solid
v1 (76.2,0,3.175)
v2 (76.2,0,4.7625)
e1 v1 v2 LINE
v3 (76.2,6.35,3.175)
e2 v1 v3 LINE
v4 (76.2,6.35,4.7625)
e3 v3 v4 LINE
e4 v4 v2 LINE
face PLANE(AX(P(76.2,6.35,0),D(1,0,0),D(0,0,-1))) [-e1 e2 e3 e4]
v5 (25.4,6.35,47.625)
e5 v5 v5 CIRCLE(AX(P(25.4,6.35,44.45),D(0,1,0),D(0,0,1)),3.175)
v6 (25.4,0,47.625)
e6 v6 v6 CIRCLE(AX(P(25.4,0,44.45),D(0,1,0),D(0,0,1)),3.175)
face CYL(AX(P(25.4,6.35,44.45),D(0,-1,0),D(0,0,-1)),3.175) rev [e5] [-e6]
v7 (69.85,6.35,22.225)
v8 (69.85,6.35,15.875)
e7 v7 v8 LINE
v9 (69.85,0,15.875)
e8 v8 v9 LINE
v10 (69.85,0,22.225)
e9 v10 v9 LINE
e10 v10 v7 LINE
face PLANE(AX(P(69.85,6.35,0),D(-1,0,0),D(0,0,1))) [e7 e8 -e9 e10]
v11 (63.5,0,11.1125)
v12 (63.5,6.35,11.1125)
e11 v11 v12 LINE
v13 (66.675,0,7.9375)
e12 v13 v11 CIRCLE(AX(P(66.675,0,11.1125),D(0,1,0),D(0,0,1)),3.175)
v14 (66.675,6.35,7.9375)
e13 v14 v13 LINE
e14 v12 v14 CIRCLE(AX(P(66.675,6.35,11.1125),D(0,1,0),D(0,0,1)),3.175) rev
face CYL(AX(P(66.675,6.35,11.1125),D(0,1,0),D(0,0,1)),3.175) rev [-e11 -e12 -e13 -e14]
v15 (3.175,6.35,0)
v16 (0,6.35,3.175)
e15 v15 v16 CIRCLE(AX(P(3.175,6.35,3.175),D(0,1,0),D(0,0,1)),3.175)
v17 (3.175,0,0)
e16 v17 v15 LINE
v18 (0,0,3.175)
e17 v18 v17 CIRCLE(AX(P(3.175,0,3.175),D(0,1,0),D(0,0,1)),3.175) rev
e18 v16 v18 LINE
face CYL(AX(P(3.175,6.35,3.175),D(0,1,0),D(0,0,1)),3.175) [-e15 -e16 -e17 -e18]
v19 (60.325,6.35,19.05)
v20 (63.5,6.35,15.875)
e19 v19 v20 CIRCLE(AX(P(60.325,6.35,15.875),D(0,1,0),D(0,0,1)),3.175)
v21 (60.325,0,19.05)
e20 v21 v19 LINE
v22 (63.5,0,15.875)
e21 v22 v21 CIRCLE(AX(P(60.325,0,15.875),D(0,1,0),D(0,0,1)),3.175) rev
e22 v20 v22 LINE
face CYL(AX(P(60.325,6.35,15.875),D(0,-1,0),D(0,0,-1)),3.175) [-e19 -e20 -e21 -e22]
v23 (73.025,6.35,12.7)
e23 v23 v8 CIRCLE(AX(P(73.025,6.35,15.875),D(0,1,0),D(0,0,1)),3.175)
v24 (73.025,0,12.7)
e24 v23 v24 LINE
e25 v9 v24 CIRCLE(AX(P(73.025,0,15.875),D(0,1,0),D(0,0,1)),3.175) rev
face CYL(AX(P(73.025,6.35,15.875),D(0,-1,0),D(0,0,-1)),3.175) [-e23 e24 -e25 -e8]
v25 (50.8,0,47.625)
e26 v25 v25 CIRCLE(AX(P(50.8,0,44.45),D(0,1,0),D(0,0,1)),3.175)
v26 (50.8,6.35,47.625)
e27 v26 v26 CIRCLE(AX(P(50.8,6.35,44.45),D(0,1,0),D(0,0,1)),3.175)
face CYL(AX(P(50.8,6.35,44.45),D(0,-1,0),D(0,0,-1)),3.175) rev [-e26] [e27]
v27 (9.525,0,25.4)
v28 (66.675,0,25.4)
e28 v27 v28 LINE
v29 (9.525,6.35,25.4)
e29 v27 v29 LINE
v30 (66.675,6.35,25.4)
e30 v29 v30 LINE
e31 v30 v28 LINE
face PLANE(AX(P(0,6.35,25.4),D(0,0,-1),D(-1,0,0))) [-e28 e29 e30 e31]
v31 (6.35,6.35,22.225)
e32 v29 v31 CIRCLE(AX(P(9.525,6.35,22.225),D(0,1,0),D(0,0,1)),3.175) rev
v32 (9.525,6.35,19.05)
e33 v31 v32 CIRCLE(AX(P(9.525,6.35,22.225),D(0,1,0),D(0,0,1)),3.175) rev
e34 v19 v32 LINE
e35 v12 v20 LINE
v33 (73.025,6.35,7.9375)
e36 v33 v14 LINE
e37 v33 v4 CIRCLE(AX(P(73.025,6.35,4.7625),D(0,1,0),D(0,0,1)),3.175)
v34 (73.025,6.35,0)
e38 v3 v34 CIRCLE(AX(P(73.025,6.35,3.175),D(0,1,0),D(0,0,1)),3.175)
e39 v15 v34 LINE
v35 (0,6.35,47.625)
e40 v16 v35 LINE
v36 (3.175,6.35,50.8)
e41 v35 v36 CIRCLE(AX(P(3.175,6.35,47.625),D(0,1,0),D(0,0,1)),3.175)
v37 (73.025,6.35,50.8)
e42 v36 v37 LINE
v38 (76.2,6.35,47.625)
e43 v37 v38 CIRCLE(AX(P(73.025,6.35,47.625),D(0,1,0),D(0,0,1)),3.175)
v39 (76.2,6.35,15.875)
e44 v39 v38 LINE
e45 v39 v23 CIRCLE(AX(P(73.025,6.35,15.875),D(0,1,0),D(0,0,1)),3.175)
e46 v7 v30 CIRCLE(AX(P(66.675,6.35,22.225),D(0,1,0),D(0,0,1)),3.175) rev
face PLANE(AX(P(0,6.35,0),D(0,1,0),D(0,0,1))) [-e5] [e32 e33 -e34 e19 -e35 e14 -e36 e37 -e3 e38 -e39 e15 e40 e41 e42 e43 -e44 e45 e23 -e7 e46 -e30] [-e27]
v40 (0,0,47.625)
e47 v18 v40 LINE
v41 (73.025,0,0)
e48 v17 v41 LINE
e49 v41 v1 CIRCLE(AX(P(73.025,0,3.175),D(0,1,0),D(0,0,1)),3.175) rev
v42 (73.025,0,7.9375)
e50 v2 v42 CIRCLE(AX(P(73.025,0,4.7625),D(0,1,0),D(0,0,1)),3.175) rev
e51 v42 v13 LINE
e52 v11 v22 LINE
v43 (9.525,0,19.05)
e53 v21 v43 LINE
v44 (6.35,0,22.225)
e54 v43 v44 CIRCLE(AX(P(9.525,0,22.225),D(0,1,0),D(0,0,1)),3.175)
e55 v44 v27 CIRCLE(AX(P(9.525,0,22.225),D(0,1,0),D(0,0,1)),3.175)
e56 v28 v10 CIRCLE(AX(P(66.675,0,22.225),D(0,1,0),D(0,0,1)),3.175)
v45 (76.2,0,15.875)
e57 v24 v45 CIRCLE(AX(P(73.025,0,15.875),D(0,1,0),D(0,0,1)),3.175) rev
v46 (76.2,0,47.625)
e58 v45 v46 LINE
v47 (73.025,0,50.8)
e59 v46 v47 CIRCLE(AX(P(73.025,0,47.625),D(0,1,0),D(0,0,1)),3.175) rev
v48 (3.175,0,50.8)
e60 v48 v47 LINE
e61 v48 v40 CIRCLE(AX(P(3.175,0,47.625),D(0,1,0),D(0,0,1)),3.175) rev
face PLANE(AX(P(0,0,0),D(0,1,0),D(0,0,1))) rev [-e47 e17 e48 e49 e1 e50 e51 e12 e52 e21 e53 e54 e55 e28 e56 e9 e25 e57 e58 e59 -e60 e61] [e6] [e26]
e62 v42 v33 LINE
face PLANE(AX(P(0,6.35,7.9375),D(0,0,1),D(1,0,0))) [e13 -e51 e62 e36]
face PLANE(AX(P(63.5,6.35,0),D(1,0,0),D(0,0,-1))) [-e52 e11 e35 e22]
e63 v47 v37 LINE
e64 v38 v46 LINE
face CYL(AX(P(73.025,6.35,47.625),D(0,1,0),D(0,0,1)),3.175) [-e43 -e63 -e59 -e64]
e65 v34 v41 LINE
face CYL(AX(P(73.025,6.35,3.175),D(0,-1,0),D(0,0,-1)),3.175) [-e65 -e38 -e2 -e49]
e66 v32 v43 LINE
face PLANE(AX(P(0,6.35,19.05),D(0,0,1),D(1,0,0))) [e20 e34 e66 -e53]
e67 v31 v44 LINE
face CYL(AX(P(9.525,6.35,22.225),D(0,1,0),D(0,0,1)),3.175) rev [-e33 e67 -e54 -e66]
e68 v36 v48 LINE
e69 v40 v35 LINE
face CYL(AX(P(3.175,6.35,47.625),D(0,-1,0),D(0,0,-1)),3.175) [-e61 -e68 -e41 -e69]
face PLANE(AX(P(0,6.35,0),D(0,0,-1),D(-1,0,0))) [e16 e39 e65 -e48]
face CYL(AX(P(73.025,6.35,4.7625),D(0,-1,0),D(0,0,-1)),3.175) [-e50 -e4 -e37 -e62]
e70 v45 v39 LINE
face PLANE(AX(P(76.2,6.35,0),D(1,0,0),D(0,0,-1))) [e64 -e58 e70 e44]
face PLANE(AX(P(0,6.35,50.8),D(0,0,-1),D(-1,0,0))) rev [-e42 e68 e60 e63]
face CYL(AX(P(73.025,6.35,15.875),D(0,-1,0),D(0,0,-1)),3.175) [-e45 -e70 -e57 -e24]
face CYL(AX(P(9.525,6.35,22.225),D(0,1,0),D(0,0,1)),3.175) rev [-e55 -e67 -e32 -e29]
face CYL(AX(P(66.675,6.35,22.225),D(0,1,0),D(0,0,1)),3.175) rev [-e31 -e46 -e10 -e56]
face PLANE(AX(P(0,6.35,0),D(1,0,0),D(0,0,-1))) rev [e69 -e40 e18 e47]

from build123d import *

# Parameters (mm, degrees)
SKETCH1_R           = 3.175
BOSS_EXTRUDE1_DEPTH = 6.35
FILLET1_R           = 3.175
FILLET2_R           = 3.175
FILLET3_R           = 3.175
FILLET4_R           = 3.175


with BuildPart() as part:
    # Sketch1 → Boss-Extrude1 (new body)
    with BuildSketch(Plane(origin=(0, 0, 0), x_dir=(1, 0, 0), z_dir=(0, 1, 0))):
        Polygon((63.5, -7.9375), (76.2, -7.9375), (76.2, 0), (0, 0), (0, -50.8), (76.2, -50.8), (76.2, -12.7), (69.85, -12.7), (69.85, -25.4), (6.35, -25.4), (6.35, -19.05), (63.5, -19.05), align=None)
        with Locations(Location((25.4, -44.45, 0), (0, 0, 270))):
            Circle(SKETCH1_R, mode=Mode.SUBTRACT)
        with Locations(Location((50.8, -44.45, 0), (0, 0, 270))):
            Circle(SKETCH1_R, mode=Mode.SUBTRACT)
    extrude(amount=BOSS_EXTRUDE1_DEPTH)

    # Fillet1
    fillet1_edges = [part.edges().sort_by_distance(p)[0] for p in [
        (6.35, 3.175, 19.05),
        (6.35, 3.175, 25.4),
    ]]
    fillet(fillet1_edges, radius=FILLET1_R - 0.0001)  # a hair under: the kernel refuses the full size

    # Fillet2
    fillet2_edges = [part.edges().sort_by_distance(p)[0] for p in [
        (76.2, 3.175, 50.8),
        (0, 3.175, 50.8),
        (0, 3.175, 0),
        (76.2, 3.175, 0),
    ]]
    fillet(fillet2_edges, radius=FILLET2_R)

    # Fillet3
    fillet3_edges = [part.edges().sort_by_distance(p)[0] for p in [
        (76.2, 3.175, 12.7),
        (76.2, 3.175, 7.9375),
        (63.5, 3.175, 7.9375),
        (63.5, 3.175, 19.05),
        (69.85, 3.175, 25.4),
    ]]
    fillet(fillet3_edges, radius=FILLET3_R)

    # Fillet4
    fillet4_edges = [part.edges().sort_by_distance(p)[0] for p in [
        (69.85, 3.175, 12.7),
    ]]
    fillet(fillet4_edges, radius=FILLET4_R - 0.0001)  # a hair under: the kernel refuses the full size


solid = part.part
